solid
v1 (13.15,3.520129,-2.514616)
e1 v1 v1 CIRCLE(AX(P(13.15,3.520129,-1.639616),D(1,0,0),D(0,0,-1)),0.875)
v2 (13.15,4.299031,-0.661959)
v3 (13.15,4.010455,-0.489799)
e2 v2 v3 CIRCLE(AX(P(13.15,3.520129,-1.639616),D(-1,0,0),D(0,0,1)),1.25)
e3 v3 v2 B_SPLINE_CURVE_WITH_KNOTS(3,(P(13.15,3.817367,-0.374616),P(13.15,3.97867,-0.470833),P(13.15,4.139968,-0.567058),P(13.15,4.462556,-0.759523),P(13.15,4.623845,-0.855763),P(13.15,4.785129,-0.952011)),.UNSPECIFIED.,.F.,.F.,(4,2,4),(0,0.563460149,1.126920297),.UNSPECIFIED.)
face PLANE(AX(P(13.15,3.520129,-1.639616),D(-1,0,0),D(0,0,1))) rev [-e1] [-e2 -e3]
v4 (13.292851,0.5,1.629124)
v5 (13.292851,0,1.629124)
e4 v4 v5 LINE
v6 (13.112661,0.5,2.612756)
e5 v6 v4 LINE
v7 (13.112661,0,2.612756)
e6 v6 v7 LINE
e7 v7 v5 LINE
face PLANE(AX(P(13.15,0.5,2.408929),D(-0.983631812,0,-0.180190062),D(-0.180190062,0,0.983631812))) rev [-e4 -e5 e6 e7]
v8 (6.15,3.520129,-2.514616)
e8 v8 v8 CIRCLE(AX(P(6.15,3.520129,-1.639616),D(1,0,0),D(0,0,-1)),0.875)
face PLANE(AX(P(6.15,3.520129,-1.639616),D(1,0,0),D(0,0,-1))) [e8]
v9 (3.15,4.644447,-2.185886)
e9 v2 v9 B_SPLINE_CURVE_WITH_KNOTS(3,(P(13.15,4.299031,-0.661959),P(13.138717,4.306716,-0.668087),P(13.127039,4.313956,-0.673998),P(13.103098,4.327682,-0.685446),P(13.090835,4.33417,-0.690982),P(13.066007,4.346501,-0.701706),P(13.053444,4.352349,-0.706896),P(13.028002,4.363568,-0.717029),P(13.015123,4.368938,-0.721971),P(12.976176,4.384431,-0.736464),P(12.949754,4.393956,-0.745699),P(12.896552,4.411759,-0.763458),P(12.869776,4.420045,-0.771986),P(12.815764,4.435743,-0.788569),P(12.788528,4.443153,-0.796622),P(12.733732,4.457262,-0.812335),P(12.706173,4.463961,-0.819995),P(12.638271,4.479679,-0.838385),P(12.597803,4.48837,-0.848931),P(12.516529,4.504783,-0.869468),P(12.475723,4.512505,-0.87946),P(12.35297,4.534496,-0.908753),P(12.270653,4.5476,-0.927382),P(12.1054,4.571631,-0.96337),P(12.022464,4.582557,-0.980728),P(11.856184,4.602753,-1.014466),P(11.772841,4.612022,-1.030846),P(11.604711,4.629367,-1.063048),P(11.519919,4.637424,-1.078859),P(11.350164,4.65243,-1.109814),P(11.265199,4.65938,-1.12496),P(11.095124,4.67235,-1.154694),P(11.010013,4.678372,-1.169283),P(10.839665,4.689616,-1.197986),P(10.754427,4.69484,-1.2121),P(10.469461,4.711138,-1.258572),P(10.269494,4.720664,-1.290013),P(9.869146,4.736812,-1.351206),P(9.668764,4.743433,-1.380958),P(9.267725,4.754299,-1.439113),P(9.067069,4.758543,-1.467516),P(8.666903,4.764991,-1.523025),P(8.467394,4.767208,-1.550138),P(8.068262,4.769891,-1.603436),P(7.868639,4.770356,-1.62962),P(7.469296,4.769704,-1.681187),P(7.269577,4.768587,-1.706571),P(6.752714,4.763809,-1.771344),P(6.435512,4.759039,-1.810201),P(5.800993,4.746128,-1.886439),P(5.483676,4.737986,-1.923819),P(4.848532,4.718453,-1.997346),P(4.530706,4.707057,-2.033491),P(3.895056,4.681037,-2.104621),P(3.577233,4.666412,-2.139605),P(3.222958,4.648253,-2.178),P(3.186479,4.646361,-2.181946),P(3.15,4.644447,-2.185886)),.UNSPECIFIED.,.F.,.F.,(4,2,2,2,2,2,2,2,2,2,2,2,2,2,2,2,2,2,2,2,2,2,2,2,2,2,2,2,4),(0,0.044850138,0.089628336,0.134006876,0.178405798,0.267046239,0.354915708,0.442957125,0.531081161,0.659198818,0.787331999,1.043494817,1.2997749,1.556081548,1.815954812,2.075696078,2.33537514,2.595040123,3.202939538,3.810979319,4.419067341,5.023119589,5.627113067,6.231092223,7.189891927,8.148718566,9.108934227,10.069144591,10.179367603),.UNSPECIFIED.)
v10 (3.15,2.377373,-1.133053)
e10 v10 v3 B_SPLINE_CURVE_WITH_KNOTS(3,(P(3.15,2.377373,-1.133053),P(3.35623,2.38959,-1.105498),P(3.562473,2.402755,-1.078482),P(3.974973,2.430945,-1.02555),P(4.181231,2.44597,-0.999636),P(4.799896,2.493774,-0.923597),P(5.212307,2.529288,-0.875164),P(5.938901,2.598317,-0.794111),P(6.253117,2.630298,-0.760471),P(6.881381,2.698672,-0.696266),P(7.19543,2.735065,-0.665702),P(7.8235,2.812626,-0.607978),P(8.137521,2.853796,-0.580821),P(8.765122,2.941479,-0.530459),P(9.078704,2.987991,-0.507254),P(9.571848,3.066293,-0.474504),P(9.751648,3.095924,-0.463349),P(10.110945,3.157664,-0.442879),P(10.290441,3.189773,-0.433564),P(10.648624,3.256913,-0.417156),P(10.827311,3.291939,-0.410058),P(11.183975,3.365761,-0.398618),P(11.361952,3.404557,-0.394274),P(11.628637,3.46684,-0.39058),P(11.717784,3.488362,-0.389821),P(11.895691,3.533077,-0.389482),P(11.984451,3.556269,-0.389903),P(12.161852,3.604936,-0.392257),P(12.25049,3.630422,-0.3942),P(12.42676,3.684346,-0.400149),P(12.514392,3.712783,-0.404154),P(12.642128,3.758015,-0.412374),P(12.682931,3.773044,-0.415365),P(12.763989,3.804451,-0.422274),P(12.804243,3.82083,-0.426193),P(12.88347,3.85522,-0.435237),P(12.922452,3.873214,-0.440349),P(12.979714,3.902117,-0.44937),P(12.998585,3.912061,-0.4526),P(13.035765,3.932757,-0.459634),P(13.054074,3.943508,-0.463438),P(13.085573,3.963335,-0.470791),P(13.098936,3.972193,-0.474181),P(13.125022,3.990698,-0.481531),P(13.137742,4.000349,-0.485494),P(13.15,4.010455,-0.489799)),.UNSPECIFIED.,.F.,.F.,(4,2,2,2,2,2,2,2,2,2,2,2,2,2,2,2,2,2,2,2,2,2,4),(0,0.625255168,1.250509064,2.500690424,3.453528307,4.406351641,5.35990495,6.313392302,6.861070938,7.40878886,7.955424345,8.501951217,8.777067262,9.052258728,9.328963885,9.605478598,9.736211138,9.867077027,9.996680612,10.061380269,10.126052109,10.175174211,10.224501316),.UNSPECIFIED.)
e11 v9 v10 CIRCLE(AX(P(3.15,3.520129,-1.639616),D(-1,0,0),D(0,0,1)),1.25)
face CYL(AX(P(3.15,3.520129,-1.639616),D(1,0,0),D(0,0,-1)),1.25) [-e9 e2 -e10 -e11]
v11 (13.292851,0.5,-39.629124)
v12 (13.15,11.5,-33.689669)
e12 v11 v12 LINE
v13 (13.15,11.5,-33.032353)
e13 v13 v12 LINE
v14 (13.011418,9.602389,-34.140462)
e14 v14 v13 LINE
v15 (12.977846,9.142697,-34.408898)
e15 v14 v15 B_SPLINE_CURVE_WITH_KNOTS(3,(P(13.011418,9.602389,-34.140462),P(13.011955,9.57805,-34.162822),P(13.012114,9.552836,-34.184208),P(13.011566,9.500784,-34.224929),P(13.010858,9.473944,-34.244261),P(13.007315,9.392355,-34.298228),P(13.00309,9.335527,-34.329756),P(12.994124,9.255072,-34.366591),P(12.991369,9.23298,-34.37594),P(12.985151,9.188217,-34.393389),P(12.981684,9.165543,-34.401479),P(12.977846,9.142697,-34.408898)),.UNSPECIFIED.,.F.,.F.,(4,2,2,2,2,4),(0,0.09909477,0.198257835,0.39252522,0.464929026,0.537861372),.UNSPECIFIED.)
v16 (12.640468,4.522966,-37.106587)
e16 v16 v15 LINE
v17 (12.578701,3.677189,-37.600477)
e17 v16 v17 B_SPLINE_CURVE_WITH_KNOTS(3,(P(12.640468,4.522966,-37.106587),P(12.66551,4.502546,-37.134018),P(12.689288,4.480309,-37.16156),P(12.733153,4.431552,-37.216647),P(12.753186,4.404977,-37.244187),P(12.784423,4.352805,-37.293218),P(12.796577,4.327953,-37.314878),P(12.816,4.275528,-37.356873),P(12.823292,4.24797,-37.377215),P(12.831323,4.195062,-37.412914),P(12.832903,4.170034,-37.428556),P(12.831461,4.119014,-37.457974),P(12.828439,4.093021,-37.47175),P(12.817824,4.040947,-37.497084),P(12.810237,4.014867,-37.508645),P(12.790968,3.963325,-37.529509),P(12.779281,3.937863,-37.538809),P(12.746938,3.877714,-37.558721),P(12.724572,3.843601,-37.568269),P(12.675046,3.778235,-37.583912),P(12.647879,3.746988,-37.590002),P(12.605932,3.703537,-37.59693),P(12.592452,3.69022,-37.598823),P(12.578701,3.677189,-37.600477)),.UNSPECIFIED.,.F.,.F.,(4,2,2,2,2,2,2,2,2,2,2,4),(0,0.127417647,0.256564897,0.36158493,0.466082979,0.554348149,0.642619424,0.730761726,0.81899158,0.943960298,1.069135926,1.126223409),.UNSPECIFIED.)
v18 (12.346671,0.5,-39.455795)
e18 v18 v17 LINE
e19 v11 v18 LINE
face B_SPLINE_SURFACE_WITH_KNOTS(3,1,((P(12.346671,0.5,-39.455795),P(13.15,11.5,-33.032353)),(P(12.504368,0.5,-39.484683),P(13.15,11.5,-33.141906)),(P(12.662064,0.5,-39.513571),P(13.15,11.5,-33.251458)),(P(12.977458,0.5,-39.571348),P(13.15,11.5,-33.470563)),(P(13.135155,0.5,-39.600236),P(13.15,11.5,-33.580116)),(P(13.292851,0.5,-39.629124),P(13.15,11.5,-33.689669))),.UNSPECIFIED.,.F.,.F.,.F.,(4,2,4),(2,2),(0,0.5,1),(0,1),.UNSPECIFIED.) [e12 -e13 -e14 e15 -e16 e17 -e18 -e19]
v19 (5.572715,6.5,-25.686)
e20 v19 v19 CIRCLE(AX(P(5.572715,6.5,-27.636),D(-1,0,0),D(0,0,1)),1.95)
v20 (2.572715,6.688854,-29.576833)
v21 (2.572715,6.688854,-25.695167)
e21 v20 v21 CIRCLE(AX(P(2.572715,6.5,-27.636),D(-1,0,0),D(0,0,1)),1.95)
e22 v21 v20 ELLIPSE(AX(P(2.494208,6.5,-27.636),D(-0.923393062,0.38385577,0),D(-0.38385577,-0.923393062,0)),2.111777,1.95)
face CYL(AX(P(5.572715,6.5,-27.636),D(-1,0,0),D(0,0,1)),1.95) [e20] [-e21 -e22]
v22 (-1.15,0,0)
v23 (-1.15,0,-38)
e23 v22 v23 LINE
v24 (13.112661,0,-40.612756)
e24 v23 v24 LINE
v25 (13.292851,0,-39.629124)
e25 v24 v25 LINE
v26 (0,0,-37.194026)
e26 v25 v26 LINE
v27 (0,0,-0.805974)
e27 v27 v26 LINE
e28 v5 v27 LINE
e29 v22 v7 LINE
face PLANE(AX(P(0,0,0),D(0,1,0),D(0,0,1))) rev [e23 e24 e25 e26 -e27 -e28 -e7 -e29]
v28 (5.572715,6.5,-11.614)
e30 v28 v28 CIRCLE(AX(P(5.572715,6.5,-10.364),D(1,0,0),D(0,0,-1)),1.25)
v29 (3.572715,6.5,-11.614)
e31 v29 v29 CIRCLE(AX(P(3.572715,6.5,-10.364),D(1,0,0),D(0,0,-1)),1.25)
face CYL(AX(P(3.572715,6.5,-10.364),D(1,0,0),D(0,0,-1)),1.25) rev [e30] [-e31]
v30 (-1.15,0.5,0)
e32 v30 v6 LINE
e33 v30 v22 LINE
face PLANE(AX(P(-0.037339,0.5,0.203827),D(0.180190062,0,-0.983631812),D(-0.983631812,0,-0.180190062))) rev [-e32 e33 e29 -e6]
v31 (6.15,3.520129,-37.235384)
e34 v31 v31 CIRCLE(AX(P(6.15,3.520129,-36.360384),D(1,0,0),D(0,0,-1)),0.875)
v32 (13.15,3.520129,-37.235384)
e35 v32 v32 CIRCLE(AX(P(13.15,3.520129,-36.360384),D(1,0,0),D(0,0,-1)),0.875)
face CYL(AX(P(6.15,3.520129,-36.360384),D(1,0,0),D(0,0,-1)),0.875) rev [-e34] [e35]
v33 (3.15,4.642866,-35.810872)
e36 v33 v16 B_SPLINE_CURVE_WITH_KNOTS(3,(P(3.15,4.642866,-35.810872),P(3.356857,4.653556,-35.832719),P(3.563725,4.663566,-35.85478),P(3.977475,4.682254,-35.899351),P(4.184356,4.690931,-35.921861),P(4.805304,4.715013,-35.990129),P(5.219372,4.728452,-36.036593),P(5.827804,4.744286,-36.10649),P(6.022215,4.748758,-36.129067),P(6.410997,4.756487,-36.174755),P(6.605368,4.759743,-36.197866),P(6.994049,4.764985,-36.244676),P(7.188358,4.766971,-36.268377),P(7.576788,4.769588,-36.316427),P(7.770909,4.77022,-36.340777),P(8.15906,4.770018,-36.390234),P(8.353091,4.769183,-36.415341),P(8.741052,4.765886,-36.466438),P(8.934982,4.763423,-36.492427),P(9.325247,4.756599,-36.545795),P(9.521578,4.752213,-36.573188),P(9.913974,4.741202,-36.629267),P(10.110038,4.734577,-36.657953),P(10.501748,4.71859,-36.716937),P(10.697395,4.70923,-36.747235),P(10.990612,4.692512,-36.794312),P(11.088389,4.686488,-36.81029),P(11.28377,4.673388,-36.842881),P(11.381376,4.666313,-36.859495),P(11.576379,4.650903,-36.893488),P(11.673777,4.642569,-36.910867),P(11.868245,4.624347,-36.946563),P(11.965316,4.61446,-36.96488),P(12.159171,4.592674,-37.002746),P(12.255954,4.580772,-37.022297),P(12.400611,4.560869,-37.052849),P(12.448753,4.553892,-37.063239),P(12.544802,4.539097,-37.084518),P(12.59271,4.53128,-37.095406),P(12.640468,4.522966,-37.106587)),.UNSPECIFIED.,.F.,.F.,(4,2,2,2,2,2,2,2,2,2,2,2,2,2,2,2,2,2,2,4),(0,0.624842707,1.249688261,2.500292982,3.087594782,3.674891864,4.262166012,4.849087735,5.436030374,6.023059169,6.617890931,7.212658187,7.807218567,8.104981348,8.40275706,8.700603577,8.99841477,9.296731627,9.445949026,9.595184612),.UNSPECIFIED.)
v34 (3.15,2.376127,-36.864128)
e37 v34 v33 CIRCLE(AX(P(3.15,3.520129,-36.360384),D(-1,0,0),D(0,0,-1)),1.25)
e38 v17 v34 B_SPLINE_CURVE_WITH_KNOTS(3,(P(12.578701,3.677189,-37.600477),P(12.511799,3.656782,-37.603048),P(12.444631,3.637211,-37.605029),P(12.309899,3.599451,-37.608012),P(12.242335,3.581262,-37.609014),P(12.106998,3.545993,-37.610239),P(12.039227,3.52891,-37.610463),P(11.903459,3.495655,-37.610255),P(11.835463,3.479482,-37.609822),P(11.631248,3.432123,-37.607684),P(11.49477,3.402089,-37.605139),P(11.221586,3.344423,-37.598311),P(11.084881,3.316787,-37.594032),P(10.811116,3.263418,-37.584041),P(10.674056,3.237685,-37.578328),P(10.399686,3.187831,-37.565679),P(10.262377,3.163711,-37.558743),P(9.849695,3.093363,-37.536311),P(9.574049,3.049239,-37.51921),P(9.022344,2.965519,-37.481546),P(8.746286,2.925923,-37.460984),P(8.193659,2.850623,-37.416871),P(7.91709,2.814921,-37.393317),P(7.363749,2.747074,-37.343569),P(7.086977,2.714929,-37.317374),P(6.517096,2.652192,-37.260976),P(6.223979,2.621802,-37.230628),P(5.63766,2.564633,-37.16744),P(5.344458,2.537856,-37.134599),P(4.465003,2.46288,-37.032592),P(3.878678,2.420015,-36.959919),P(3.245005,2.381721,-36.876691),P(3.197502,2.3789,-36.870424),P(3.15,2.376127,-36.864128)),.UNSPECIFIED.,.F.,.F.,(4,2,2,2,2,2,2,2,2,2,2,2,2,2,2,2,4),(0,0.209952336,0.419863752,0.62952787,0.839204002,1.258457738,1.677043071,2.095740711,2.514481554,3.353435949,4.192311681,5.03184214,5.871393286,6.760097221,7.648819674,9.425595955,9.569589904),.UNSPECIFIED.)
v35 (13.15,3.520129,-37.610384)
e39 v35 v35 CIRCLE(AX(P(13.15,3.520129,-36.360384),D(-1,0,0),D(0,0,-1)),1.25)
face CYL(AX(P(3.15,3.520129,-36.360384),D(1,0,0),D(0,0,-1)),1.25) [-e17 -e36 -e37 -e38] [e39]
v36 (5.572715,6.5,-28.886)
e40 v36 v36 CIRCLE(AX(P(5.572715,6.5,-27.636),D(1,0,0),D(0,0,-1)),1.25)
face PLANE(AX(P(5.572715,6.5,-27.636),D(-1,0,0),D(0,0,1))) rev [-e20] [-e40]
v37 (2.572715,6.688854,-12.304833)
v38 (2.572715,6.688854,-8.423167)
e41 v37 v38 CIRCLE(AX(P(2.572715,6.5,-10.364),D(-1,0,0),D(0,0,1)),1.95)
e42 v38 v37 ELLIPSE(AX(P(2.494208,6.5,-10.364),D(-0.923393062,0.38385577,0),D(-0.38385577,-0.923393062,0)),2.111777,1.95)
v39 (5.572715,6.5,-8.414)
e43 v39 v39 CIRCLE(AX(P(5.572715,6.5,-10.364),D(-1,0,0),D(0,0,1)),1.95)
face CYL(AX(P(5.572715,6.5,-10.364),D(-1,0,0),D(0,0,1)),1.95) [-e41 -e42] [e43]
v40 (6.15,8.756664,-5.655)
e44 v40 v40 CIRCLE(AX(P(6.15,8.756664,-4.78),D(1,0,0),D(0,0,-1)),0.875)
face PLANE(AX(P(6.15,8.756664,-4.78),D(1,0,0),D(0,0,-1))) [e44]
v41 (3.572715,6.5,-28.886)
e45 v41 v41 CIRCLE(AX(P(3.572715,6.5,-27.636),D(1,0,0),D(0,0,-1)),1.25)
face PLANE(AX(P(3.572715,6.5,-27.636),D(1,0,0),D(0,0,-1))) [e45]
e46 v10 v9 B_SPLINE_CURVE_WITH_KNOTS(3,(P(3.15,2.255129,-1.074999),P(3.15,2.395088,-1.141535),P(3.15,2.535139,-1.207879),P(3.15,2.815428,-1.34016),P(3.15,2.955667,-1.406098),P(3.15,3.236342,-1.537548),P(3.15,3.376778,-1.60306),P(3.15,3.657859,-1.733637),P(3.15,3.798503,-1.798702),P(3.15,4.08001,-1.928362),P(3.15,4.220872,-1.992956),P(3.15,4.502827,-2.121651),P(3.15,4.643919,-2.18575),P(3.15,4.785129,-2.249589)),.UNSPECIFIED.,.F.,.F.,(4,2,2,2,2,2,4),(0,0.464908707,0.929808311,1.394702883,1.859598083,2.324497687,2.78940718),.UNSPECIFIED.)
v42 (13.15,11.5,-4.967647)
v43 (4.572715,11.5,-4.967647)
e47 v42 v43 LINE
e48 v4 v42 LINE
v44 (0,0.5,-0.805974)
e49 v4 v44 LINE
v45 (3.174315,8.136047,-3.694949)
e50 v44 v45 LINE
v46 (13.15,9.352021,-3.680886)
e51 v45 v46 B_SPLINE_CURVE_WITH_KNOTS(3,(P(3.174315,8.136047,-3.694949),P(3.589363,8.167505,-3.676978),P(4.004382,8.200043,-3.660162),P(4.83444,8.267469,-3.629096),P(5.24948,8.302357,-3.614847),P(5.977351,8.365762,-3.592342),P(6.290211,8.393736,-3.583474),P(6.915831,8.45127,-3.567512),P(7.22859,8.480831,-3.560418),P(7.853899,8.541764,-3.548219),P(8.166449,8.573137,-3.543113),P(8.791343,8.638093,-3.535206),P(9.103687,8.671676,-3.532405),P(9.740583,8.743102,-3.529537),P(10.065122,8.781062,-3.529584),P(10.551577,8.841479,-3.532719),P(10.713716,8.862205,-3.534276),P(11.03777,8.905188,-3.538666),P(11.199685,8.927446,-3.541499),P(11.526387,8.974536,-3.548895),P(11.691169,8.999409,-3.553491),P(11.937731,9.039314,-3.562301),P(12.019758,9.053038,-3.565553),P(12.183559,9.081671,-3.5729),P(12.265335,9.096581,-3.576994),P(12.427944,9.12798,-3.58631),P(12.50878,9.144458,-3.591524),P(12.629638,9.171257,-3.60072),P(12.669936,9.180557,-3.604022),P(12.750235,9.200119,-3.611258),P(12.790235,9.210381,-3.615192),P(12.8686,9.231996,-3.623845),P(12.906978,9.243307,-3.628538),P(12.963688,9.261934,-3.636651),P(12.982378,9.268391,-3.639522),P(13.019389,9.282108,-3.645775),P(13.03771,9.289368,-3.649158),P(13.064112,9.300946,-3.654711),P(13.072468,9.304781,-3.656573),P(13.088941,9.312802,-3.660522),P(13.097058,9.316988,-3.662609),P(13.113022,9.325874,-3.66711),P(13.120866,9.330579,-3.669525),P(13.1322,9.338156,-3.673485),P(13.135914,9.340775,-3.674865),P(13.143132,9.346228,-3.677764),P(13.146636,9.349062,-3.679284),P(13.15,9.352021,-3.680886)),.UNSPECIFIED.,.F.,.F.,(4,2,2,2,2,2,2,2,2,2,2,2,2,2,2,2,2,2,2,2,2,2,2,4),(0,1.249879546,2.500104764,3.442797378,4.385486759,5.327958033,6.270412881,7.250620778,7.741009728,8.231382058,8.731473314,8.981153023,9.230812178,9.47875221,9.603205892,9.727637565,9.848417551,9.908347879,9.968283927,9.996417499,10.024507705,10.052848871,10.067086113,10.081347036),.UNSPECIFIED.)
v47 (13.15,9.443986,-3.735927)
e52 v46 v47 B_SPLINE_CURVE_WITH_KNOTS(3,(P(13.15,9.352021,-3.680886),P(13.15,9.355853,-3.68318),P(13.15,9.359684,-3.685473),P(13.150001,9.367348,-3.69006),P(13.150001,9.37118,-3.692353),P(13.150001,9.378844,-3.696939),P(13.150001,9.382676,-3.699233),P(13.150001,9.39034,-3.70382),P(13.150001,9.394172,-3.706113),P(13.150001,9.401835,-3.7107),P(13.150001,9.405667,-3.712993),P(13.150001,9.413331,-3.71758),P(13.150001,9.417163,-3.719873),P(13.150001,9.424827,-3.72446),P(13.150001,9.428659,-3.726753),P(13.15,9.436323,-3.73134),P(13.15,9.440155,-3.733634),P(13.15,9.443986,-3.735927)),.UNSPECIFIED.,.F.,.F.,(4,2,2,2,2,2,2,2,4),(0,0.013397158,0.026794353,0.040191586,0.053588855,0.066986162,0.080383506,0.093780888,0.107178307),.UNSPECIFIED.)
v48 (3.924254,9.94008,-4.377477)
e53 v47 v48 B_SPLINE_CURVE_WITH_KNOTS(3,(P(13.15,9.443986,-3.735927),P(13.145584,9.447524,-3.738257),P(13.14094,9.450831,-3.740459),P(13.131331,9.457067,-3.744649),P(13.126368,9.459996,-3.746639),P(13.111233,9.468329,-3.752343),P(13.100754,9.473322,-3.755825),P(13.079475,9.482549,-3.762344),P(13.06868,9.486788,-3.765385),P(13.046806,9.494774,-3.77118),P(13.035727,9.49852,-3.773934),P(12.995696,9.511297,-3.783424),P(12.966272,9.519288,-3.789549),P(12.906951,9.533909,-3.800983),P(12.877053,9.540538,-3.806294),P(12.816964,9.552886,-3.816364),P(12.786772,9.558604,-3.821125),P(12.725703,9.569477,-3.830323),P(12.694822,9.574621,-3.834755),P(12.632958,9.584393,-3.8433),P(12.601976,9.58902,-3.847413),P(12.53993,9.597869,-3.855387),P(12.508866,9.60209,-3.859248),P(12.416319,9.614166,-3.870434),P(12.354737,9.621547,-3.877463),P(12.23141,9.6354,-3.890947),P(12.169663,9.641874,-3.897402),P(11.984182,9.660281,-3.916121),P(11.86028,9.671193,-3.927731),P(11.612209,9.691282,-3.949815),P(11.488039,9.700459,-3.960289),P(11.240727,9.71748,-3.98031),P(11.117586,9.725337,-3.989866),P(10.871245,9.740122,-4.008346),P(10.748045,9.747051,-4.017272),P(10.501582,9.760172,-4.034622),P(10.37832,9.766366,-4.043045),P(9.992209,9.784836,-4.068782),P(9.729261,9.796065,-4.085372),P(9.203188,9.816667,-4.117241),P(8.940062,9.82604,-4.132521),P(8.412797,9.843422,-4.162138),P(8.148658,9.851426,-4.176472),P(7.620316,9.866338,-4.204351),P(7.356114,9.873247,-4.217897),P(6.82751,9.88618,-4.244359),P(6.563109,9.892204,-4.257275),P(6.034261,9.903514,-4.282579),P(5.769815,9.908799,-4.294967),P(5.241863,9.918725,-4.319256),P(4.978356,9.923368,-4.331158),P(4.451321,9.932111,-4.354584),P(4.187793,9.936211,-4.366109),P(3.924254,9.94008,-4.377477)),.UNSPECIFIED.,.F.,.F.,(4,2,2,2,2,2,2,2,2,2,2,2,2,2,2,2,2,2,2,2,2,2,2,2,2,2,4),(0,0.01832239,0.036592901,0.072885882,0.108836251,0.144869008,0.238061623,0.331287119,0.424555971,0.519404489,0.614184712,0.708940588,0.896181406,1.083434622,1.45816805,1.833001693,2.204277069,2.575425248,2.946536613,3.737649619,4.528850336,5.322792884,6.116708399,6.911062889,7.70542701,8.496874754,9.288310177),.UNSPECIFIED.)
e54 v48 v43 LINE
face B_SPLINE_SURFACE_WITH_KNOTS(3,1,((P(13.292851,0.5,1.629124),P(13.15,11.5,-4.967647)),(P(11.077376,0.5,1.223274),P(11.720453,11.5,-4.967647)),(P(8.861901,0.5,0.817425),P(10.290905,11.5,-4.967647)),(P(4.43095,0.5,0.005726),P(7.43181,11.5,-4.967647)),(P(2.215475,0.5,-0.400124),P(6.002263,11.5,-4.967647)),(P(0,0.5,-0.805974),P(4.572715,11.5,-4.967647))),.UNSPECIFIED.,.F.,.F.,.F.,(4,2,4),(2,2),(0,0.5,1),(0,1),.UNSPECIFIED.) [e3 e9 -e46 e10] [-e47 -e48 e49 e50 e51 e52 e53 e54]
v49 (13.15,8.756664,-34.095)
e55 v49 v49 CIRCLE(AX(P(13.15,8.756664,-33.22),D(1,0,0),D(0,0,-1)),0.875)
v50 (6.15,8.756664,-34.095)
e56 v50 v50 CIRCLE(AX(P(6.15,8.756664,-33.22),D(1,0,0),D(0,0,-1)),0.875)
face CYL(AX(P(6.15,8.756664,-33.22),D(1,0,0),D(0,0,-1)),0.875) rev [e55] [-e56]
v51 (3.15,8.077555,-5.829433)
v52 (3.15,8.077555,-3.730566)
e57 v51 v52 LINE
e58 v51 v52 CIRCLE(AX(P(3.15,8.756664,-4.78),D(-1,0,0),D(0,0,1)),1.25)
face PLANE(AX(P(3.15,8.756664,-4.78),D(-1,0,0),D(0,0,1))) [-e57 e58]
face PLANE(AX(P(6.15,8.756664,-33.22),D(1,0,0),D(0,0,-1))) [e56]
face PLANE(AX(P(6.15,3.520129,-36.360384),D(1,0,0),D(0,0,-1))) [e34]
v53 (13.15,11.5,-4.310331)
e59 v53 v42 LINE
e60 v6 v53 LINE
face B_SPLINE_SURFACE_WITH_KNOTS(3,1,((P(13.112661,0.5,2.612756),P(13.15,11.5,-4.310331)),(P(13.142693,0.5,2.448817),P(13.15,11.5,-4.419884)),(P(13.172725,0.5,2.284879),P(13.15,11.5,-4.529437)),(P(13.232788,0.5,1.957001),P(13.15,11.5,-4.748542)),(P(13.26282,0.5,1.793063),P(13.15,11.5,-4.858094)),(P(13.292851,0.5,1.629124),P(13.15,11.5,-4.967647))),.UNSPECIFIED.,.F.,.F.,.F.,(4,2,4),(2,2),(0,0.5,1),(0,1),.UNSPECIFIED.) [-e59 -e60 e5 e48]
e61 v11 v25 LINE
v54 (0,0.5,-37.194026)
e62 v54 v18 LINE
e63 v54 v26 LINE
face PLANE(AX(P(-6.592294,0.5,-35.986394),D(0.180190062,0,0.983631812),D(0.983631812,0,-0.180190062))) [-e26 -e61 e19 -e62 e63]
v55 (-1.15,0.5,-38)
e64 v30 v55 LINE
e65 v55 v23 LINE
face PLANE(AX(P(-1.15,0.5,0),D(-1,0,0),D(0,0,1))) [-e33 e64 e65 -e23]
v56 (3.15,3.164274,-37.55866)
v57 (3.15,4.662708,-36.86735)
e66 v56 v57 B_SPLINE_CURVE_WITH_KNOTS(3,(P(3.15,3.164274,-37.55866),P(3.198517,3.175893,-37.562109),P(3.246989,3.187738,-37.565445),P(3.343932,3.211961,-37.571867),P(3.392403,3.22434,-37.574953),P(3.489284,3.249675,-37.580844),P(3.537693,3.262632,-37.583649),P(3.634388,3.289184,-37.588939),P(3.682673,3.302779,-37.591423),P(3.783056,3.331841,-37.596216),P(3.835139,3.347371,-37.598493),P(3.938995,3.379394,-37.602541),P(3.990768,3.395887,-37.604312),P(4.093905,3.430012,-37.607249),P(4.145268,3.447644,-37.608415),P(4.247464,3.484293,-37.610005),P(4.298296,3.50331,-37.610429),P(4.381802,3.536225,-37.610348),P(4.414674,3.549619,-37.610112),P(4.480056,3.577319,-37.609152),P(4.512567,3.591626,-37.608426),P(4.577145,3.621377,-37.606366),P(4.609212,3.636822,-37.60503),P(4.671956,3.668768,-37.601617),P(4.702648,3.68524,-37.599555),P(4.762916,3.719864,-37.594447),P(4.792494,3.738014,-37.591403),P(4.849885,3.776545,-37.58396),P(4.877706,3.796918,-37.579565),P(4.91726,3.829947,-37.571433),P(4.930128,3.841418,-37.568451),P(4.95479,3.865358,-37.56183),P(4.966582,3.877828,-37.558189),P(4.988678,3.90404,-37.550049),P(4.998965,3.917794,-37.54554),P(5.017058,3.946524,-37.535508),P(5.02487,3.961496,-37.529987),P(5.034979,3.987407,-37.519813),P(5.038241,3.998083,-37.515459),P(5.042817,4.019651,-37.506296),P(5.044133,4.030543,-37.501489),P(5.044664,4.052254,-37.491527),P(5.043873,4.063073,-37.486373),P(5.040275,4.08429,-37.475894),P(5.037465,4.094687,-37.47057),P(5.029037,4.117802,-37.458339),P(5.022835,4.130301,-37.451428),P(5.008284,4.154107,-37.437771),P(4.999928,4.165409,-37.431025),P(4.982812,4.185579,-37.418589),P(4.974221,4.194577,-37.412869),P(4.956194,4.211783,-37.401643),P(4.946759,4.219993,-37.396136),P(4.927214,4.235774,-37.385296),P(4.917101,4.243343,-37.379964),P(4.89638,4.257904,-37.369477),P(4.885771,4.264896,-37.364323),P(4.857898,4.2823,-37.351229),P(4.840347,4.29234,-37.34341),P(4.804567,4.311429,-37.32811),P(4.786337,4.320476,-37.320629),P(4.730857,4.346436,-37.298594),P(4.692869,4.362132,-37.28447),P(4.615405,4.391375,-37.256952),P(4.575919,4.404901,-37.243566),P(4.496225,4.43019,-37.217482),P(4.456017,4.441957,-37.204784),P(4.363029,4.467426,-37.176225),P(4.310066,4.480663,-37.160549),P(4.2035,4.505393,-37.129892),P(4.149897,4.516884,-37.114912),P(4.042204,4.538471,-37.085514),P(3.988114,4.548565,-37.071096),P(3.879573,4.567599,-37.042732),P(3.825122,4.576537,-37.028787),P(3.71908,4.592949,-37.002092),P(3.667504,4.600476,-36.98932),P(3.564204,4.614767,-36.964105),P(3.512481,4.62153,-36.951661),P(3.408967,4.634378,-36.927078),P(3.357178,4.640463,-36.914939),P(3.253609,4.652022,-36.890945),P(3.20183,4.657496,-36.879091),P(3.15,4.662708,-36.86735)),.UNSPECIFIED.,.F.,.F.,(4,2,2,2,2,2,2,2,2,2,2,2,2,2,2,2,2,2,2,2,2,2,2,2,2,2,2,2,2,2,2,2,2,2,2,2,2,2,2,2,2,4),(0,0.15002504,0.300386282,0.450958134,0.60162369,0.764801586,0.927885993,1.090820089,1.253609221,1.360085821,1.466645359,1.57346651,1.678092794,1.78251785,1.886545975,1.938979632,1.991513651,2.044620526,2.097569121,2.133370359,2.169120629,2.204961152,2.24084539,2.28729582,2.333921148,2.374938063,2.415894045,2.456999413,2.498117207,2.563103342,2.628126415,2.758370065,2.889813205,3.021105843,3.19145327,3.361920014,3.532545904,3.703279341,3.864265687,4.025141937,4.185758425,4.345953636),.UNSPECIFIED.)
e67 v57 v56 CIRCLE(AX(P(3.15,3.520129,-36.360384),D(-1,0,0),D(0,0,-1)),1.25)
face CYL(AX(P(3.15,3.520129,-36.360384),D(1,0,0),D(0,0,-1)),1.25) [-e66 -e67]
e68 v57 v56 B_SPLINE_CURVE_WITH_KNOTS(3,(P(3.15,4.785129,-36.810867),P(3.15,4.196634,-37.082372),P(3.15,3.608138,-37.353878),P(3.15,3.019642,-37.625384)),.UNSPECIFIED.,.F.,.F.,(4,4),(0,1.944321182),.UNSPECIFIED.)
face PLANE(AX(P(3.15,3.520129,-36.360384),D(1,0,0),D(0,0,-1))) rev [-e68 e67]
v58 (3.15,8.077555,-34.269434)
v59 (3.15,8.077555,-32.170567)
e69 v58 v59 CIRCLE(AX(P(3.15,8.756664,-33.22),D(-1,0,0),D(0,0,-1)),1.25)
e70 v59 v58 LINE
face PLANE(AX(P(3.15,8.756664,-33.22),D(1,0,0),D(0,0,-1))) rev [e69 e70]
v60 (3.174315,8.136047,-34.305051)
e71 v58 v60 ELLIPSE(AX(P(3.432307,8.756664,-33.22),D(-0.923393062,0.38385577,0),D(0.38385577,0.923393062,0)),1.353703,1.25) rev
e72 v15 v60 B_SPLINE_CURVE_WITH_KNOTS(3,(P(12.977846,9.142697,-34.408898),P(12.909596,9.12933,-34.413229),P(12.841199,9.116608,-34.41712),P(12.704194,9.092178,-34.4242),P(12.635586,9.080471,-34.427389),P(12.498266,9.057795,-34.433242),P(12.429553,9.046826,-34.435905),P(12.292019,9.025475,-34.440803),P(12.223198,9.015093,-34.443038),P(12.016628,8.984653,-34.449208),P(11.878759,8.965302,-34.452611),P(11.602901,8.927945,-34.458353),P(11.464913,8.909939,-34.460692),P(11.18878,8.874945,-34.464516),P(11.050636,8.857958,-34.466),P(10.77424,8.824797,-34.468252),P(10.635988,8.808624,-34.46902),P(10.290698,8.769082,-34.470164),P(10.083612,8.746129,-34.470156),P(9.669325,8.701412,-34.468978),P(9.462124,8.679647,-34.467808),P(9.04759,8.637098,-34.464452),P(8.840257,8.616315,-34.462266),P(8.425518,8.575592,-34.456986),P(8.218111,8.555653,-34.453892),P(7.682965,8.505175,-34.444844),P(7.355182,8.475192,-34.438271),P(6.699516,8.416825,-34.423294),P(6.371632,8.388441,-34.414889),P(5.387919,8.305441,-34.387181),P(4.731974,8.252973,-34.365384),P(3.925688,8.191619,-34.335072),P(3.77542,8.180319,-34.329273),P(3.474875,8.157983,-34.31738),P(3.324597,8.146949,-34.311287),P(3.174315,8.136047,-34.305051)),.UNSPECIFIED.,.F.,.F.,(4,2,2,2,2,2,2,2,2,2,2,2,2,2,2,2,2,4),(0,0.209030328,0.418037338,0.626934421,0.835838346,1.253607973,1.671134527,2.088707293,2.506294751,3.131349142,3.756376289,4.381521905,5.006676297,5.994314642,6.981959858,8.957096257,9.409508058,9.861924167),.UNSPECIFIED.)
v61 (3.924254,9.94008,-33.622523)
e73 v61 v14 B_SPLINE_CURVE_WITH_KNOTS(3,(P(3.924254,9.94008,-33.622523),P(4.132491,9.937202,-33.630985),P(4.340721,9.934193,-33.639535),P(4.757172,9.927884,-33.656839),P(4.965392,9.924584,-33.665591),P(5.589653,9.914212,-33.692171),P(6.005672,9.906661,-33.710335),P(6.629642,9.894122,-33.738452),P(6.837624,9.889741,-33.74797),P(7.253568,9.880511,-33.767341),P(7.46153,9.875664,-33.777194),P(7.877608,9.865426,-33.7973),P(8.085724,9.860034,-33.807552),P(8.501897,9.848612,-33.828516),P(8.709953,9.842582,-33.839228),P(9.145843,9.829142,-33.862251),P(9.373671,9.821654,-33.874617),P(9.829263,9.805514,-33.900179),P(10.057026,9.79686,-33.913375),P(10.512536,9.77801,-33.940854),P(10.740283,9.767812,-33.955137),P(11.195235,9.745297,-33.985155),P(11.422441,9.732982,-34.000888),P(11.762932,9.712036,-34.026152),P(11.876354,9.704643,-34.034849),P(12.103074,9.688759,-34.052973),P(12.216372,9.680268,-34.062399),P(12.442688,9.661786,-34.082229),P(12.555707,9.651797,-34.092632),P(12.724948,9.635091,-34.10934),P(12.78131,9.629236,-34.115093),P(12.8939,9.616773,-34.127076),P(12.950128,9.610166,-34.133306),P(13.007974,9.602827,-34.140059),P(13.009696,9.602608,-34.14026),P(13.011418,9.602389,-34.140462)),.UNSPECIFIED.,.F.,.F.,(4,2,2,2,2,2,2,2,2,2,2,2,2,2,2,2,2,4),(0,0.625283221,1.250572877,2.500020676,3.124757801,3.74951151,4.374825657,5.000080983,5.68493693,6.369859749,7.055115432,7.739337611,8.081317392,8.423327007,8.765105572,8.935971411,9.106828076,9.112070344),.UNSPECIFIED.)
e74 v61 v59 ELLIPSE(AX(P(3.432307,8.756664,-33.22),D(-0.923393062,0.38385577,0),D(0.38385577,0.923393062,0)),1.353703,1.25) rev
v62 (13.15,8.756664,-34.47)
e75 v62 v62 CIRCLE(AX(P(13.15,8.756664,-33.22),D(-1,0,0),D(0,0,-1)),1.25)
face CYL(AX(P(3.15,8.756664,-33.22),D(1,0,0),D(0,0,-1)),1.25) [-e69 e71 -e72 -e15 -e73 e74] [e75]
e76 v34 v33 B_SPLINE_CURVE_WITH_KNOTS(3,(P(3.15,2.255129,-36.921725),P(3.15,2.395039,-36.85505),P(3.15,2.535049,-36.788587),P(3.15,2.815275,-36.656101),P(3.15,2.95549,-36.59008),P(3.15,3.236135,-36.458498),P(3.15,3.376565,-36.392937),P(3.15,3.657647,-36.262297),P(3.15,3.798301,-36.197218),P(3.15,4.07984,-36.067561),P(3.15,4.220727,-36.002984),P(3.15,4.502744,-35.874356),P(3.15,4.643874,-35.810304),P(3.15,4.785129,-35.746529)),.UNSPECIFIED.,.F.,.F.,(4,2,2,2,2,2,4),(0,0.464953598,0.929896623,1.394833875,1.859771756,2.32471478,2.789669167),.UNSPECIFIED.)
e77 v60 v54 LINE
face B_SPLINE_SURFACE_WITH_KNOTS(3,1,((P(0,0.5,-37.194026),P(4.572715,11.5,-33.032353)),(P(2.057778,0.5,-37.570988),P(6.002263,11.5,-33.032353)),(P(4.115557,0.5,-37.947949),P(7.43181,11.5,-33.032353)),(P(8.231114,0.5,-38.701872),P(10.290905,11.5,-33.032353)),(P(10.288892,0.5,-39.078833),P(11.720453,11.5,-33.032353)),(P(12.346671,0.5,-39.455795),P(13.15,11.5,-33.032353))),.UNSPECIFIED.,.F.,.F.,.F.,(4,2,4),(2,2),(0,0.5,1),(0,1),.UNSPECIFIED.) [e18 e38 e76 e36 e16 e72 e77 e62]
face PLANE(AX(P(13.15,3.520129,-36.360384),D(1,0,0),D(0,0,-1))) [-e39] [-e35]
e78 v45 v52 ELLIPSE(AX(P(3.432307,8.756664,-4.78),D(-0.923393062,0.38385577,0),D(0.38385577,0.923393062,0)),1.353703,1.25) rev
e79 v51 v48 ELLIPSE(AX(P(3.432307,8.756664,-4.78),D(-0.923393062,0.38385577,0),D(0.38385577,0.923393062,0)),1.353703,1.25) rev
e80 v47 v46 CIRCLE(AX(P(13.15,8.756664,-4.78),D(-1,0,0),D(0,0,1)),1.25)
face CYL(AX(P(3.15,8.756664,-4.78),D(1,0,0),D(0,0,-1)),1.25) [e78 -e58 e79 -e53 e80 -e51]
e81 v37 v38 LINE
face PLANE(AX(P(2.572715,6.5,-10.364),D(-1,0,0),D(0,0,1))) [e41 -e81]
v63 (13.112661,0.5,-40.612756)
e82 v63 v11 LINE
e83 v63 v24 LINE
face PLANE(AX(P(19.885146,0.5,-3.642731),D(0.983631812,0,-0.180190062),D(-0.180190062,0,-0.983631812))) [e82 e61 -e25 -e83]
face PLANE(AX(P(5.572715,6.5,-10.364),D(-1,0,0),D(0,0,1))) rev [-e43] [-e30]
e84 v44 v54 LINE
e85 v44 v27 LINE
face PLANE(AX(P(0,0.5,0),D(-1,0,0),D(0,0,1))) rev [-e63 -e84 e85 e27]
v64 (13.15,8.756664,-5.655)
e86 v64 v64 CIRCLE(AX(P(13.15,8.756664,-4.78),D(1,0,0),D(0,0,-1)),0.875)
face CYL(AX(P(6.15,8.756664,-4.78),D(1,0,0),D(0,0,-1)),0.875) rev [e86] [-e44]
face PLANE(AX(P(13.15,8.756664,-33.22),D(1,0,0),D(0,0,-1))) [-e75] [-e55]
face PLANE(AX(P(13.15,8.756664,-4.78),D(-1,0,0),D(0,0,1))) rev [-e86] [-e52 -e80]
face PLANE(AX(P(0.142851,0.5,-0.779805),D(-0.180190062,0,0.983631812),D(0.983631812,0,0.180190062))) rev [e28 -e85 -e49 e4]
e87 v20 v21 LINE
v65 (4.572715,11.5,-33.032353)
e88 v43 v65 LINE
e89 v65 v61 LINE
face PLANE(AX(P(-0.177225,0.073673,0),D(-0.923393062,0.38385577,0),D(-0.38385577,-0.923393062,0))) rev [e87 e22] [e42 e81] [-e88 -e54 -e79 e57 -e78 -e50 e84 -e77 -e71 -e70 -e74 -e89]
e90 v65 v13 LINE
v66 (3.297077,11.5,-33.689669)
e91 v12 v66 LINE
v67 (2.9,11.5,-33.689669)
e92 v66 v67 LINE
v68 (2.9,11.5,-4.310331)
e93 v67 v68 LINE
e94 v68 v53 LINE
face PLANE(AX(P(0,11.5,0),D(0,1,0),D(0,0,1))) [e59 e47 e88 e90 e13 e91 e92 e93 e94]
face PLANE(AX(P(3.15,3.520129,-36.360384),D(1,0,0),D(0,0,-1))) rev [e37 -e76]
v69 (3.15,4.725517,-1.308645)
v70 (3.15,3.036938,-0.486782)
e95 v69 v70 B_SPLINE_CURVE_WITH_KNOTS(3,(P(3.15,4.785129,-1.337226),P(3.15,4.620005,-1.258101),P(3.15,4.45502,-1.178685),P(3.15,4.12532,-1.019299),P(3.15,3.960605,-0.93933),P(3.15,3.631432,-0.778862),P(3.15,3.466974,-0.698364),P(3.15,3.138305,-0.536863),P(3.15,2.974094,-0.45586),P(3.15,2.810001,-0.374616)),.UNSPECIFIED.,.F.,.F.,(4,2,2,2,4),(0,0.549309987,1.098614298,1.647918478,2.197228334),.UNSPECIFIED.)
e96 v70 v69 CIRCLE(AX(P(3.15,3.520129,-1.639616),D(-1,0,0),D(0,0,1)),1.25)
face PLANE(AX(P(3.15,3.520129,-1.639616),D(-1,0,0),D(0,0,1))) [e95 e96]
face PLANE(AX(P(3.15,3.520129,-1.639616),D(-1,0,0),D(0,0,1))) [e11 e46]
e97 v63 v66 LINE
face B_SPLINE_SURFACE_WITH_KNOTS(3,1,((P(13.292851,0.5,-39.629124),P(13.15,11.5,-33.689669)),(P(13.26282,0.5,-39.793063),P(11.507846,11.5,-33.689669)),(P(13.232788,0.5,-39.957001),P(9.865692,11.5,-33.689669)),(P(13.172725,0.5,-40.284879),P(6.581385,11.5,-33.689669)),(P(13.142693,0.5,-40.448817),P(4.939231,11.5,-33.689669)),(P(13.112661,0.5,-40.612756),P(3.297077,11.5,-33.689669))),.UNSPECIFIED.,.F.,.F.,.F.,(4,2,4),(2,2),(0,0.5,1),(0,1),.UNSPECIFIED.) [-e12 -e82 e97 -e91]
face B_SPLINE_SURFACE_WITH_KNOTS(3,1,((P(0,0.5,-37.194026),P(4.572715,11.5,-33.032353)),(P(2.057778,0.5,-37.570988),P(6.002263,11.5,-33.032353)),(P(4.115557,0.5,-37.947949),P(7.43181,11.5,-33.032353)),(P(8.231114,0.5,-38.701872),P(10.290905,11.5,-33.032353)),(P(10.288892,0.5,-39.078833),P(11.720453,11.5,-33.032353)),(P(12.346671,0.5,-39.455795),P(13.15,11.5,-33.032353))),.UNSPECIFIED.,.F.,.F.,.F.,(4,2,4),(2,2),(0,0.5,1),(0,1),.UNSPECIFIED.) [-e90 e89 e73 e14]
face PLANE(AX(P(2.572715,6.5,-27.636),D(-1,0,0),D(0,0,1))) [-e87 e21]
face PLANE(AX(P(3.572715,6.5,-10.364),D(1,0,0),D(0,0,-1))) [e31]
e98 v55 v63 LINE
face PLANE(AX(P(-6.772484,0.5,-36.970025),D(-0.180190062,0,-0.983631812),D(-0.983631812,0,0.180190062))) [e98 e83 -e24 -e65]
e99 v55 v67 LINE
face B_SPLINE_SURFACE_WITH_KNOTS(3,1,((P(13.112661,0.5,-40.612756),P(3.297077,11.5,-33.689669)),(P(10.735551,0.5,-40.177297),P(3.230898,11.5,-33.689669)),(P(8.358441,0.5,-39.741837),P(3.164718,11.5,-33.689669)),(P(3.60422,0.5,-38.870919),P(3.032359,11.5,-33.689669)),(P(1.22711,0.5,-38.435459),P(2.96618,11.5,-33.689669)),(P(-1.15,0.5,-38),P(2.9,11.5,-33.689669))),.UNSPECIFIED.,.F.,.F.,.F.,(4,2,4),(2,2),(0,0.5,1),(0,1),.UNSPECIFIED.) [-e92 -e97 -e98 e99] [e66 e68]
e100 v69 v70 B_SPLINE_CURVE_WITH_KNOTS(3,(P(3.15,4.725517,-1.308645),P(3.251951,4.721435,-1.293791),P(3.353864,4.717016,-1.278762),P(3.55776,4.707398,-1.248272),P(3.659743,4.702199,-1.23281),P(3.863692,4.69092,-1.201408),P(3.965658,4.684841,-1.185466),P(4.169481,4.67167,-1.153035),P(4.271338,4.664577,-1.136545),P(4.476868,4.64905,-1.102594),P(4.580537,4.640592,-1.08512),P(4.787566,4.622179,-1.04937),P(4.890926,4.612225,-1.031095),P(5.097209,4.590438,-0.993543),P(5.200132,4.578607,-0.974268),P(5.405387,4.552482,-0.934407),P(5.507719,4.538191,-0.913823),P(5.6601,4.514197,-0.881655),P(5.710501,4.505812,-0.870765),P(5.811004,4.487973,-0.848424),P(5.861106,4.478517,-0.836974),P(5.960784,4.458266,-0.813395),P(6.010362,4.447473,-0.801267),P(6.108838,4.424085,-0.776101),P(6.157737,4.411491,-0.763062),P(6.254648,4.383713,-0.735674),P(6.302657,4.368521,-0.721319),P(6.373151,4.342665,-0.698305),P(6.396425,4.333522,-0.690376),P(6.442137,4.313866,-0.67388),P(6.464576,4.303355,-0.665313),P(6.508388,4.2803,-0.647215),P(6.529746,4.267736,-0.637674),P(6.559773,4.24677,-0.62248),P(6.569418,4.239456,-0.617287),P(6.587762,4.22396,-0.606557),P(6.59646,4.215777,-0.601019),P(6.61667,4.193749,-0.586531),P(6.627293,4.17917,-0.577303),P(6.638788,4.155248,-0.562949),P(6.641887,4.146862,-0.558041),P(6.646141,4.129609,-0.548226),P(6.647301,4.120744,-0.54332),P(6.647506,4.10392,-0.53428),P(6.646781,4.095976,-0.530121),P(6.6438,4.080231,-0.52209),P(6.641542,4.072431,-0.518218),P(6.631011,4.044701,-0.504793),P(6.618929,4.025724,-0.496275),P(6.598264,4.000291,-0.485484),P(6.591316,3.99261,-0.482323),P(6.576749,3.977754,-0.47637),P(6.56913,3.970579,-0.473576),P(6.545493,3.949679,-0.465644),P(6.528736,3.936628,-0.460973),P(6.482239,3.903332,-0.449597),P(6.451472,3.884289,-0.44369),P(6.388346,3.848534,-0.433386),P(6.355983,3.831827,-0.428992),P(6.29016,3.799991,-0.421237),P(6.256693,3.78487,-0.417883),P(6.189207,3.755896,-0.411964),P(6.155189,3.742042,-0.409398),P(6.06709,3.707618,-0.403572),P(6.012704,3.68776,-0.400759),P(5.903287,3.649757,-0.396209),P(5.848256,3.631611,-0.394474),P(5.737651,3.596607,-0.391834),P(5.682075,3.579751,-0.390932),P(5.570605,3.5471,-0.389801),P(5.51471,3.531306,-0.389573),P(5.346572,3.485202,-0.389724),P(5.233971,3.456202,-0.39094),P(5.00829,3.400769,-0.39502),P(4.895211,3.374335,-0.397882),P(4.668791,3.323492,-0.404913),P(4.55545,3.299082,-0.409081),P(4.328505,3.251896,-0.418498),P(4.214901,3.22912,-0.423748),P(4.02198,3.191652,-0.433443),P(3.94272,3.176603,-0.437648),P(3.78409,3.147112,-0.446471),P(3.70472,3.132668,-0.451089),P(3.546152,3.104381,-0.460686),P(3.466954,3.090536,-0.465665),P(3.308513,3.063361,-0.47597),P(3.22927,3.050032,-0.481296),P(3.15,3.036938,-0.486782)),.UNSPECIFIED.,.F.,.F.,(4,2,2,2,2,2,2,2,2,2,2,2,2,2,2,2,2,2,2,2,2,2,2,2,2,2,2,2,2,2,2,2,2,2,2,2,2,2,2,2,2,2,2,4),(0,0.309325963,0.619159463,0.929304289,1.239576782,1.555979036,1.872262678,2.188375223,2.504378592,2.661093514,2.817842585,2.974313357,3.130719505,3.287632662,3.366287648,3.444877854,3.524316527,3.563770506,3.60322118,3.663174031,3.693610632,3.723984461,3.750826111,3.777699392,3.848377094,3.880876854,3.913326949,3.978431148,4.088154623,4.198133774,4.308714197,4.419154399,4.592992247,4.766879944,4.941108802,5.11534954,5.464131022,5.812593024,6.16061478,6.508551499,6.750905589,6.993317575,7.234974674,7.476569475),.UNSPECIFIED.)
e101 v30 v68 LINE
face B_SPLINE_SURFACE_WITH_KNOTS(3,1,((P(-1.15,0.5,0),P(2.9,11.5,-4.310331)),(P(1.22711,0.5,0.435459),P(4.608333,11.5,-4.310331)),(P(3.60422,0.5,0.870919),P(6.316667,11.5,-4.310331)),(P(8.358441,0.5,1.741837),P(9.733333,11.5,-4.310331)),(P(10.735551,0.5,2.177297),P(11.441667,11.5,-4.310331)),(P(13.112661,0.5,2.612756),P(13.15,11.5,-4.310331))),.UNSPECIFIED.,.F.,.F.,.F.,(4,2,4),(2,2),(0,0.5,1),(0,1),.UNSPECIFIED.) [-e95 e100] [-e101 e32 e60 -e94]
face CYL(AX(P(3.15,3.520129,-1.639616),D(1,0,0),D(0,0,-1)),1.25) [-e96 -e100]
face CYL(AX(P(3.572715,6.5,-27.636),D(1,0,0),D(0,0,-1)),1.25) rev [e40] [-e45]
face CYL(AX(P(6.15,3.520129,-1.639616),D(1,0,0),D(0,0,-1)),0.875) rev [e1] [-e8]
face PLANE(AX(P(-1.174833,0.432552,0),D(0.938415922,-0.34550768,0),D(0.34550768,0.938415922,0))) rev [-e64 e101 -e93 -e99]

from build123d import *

# Parameters (mm, degrees)
SKETCH1_W                = 1.15
SKETCH1_H                = 38
BOSS_EXTRUDE1_DEPTH      = 0.5
BOSS_EXTRUDE2_OUTLINE_R  = 1.25
BOSS_EXTRUDE2_DEPTH      = 10
SKETCH6_R                = 0.875
CUT_EXTRUDE1_DEPTH       = 7
BOSS_EXTRUDE4_DEPTH      = 2
BOSS_EXTRUDE4_DEPTH_BACK = 1
SKETCH8_R                = 1.95
SKETCH9_R                = 1.25
CUT_EXTRUDE2_DEPTH       = 2


with BuildPart() as part:
    # Sketch1 → Boss-Extrude1 (new body)
    with BuildSketch(Plane(origin=(0, 0, 0), x_dir=(1, 0, 0), z_dir=(0, 1, 0))):
        with Locations((-0.575, 19)):
            Rectangle(SKETCH1_W, SKETCH1_H)
        Polygon((13.112661273, 40.612755906), (-1.15, 38), (0, 38), (0, 37.194026242), (13.292851335, 39.629124094), (13.15, 40.408929127), align=None)
        Polygon((0, 0), (-1.15, 0), (13.112661273, -2.612755906), (13.15, -2.408929127), (13.292851335, -1.629124094), (0, 0.805973758), align=None)
    extrude(amount=BOSS_EXTRUDE1_DEPTH)

    # Loft5: read off the stored shape, not the designer's step
    # Loft5: loft between two sections, ruled curve by curve
    loft5_from = [
        Edge.make_bspline([(0, 0.5, -37.194026242), (2.057778489, 0.5, -37.570987652), (4.115556979, 0.5, -37.947949061), (8.231113957, 0.5, -38.701871881), (10.288892446, 0.5, -39.078833291), (12.346670936, 0.5, -39.4557947)], [0, 0, 0, 0, 0.5, 0.5, 1, 1, 1, 1], 3),
        Edge.make_bspline([(12.346670936, 0.5, -39.4557947), (12.504367669, 0.5, -39.484682933), (12.662064402, 0.5, -39.513571165), (12.977457869, 0.5, -39.571347629), (13.135154602, 0.5, -39.600235862), (13.292851335, 0.5, -39.629124094)], [0, 0, 0, 0, 0.5, 0.5, 1, 1, 1, 1], 3),
        Edge.make_bspline([(13.292851335, 0.5, -39.629124094), (13.262819658, 0.5, -39.793062729), (13.232787981, 0.5, -39.957001365), (13.172724627, 0.5, -40.284878635), (13.14269295, 0.5, -40.44881727), (13.112661273, 0.5, -40.612755906)], [0, 0, 0, 0, 0.5, 0.5, 1, 1, 1, 1], 3),
        Edge.make_bspline([(13.112661273, 0.5, -40.612755906), (10.73555106, 0.5, -40.177296588), (8.358440848, 0.5, -39.741837271), (3.604220424, 0.5, -38.870918635), (1.227110212, 0.5, -38.435459318), (-1.15, 0.5, -38)], [0, 0, 0, 0, 0.5, 0.5, 1, 1, 1, 1], 3),
        Edge.make_bspline([(-1.15, 0.5, 0), (1.227110212, 0.5, 0.435459318), (3.604220424, 0.5, 0.870918635), (8.358440848, 0.5, 1.741837271), (10.73555106, 0.5, 2.177296588), (13.112661273, 0.5, 2.612755906)], [0, 0, 0, 0, 0.5, 0.5, 1, 1, 1, 1], 3),
        Edge.make_bspline([(13.112661273, 0.5, 2.612755906), (13.14269295, 0.5, 2.44881727), (13.172724627, 0.5, 2.284878635), (13.232787981, 0.5, 1.957001365), (13.262819658, 0.5, 1.793062729), (13.292851335, 0.5, 1.629124094)], [0, 0, 0, 0, 0.5, 0.5, 1, 1, 1, 1], 3),
        Edge.make_bspline([(13.292851335, 0.5, 1.629124094), (11.077376113, 0.5, 1.223274452), (8.86190089, 0.5, 0.81742481), (4.430950445, 0.5, 0.005725526), (2.215475223, 0.5, -0.400124116), (0, 0.5, -0.805973758)], [0, 0, 0, 0, 0.5, 0.5, 1, 1, 1, 1], 3),
        Edge.make_line((0, 0.5, -37.194026242), (0, 0.5, -0.805973758)),
        Edge.make_line((-1.15, 0.5, 0), (-1.15, 0.5, -38)),
    ]
    loft5_to = [
        Edge.make_bspline([(4.572715179, 11.5, -33.032352977), (6.002262649, 11.5, -33.032352977), (7.431810119, 11.5, -33.032352977), (10.29090506, 11.5, -33.032352977), (11.72045253, 11.5, -33.032352977), (13.15, 11.5, -33.032352977)], [0, 0, 0, 0, 0.5, 0.5, 1, 1, 1, 1], 3),
        Edge.make_bspline([(13.15, 11.5, -33.032352977), (13.15, 11.5, -33.141905569), (13.15, 11.5, -33.25145816), (13.15, 11.5, -33.470563343), (13.15, 11.5, -33.580115935), (13.15, 11.5, -33.689668526)], [0, 0, 0, 0, 0.5, 0.5, 1, 1, 1, 1], 3),
        Edge.make_bspline([(13.15, 11.5, -33.689668526), (11.507846202, 11.5, -33.689668526), (9.865692404, 11.5, -33.689668526), (6.581384807, 11.5, -33.689668526), (4.939231009, 11.5, -33.689668526), (3.297077211, 11.5, -33.689668526)], [0, 0, 0, 0, 0.5, 0.5, 1, 1, 1, 1], 3),
        Edge.make_bspline([(3.297077211, 11.5, -33.689668526), (3.230897676, 11.5, -33.689668526), (3.16471814, 11.5, -33.689668526), (3.03235907, 11.5, -33.689668526), (2.966179535, 11.5, -33.689668526), (2.9, 11.5, -33.689668526)], [0, 0, 0, 0, 0.5, 0.5, 1, 1, 1, 1], 3),
        Edge.make_bspline([(2.9, 11.5, -4.310331474), (4.608333333, 11.5, -4.310331474), (6.316666667, 11.5, -4.310331474), (9.733333333, 11.5, -4.310331474), (11.441666667, 11.5, -4.310331474), (13.15, 11.5, -4.310331474)], [0, 0, 0, 0, 0.5, 0.5, 1, 1, 1, 1], 3),
        Edge.make_bspline([(13.15, 11.5, -4.310331474), (13.15, 11.5, -4.419884065), (13.15, 11.5, -4.529436657), (13.15, 11.5, -4.74854184), (13.15, 11.5, -4.858094431), (13.15, 11.5, -4.967647023)], [0, 0, 0, 0, 0.5, 0.5, 1, 1, 1, 1], 3),
        Edge.make_bspline([(13.15, 11.5, -4.967647023), (11.72045253, 11.5, -4.967647023), (10.29090506, 11.5, -4.967647023), (7.431810119, 11.5, -4.967647023), (6.002262649, 11.5, -4.967647023), (4.572715179, 11.5, -4.967647023)], [0, 0, 0, 0, 0.5, 0.5, 1, 1, 1, 1], 3),
        Edge.make_line((4.572715179, 11.5, -33.032352977), (4.572715179, 11.5, -4.967647023)),
        Edge.make_line((2.9, 11.5, -4.310331474), (2.9, 11.5, -33.689668526)),
    ]
    loft5 = Solid(Shell([*[Face.make_surface_from_curves(loft5_from[k], loft5_to[k]) for k in range(9)], Face(Wire(loft5_from)), Face(Wire(loft5_to))]))
    add(loft5)

    # Boss-Extrude2: read off the stored shape, not the designer's step
    # Boss-Extrude2 outline → Boss-Extrude2 (add)
    with BuildSketch(Plane.ZY.offset(-13.15)):
        with BuildLine():
            ThreePointArc((-3.735927195, 9.443986427), (-5.852578834, 8.114733735), (-3.680886419, 9.35202066))
            Line((-3.680886419, 9.35202066), (-3.706433646, 9.399184465))
            Line((-3.706433646, 9.399184465), (-3.735927195, 9.443986427))
        make_face()
        with BuildLine():
            ThreePointArc((-0.486782416, 3.036937924), (-0.515675127, 4.067172643), (-1.308645245, 4.725516594))
            ThreePointArc((-1.308645245, 4.725516594), (-2.763557459, 2.973086258), (-0.486782416, 3.036937924))
        make_face()
        with BuildLine():
            ThreePointArc((-37.558660337, 3.164273978), (-35.225355296, 2.99647832), (-36.867350368, 4.66270759))
            ThreePointArc((-36.867350368, 4.66270759), (-37.495412118, 4.043780582), (-37.558660337, 3.164273978))
        make_face()
        with Locations((-33.220000244, 8.756663732)):
            Circle(BOSS_EXTRUDE2_OUTLINE_R)
    extrude(amount=BOSS_EXTRUDE2_DEPTH)

    # Sketch6 → Cut-Extrude1 (cut)
    with BuildSketch(Plane(origin=(13.15, 0, 0), x_dir=(0, 0, -1), z_dir=(1, 0, 0))):
        with Locations((4.779999756, 8.756663732)):
            Circle(SKETCH6_R)
        with Locations((1.639616293, 3.520129451)):
            Circle(SKETCH6_R)
        with Locations((33.220000244, 8.756663732)):
            Circle(SKETCH6_R)
        with Locations((36.360383707, 3.520129451)):
            Circle(SKETCH6_R)
    extrude(amount=-CUT_EXTRUDE1_DEPTH, mode=Mode.SUBTRACT)

    # Sketch8 → Boss-Extrude4 (add, two sides: drawn at the far end of the back side and taken through both)
    with BuildSketch(Plane.ZY.offset(-4.572715179).offset(-BOSS_EXTRUDE4_DEPTH_BACK)):
        with Locations((-10.364, 6.5)):
            Circle(SKETCH8_R)
        with Locations((-27.636, 6.5)):
            Circle(SKETCH8_R)
    extrude(amount=BOSS_EXTRUDE4_DEPTH + BOSS_EXTRUDE4_DEPTH_BACK)

    # Sketch9 → Cut-Extrude2 (cut)
    with BuildSketch(Plane(origin=(5.572715179, 0, 0), x_dir=(0, 0, -1), z_dir=(1, 0, 0))):
        with Locations((10.364, 6.5)):
            Circle(SKETCH9_R)
        with Locations((27.636, 6.5)):
            Circle(SKETCH9_R)
    extrude(amount=-CUT_EXTRUDE2_DEPTH, mode=Mode.SUBTRACT)


solid = part.part
